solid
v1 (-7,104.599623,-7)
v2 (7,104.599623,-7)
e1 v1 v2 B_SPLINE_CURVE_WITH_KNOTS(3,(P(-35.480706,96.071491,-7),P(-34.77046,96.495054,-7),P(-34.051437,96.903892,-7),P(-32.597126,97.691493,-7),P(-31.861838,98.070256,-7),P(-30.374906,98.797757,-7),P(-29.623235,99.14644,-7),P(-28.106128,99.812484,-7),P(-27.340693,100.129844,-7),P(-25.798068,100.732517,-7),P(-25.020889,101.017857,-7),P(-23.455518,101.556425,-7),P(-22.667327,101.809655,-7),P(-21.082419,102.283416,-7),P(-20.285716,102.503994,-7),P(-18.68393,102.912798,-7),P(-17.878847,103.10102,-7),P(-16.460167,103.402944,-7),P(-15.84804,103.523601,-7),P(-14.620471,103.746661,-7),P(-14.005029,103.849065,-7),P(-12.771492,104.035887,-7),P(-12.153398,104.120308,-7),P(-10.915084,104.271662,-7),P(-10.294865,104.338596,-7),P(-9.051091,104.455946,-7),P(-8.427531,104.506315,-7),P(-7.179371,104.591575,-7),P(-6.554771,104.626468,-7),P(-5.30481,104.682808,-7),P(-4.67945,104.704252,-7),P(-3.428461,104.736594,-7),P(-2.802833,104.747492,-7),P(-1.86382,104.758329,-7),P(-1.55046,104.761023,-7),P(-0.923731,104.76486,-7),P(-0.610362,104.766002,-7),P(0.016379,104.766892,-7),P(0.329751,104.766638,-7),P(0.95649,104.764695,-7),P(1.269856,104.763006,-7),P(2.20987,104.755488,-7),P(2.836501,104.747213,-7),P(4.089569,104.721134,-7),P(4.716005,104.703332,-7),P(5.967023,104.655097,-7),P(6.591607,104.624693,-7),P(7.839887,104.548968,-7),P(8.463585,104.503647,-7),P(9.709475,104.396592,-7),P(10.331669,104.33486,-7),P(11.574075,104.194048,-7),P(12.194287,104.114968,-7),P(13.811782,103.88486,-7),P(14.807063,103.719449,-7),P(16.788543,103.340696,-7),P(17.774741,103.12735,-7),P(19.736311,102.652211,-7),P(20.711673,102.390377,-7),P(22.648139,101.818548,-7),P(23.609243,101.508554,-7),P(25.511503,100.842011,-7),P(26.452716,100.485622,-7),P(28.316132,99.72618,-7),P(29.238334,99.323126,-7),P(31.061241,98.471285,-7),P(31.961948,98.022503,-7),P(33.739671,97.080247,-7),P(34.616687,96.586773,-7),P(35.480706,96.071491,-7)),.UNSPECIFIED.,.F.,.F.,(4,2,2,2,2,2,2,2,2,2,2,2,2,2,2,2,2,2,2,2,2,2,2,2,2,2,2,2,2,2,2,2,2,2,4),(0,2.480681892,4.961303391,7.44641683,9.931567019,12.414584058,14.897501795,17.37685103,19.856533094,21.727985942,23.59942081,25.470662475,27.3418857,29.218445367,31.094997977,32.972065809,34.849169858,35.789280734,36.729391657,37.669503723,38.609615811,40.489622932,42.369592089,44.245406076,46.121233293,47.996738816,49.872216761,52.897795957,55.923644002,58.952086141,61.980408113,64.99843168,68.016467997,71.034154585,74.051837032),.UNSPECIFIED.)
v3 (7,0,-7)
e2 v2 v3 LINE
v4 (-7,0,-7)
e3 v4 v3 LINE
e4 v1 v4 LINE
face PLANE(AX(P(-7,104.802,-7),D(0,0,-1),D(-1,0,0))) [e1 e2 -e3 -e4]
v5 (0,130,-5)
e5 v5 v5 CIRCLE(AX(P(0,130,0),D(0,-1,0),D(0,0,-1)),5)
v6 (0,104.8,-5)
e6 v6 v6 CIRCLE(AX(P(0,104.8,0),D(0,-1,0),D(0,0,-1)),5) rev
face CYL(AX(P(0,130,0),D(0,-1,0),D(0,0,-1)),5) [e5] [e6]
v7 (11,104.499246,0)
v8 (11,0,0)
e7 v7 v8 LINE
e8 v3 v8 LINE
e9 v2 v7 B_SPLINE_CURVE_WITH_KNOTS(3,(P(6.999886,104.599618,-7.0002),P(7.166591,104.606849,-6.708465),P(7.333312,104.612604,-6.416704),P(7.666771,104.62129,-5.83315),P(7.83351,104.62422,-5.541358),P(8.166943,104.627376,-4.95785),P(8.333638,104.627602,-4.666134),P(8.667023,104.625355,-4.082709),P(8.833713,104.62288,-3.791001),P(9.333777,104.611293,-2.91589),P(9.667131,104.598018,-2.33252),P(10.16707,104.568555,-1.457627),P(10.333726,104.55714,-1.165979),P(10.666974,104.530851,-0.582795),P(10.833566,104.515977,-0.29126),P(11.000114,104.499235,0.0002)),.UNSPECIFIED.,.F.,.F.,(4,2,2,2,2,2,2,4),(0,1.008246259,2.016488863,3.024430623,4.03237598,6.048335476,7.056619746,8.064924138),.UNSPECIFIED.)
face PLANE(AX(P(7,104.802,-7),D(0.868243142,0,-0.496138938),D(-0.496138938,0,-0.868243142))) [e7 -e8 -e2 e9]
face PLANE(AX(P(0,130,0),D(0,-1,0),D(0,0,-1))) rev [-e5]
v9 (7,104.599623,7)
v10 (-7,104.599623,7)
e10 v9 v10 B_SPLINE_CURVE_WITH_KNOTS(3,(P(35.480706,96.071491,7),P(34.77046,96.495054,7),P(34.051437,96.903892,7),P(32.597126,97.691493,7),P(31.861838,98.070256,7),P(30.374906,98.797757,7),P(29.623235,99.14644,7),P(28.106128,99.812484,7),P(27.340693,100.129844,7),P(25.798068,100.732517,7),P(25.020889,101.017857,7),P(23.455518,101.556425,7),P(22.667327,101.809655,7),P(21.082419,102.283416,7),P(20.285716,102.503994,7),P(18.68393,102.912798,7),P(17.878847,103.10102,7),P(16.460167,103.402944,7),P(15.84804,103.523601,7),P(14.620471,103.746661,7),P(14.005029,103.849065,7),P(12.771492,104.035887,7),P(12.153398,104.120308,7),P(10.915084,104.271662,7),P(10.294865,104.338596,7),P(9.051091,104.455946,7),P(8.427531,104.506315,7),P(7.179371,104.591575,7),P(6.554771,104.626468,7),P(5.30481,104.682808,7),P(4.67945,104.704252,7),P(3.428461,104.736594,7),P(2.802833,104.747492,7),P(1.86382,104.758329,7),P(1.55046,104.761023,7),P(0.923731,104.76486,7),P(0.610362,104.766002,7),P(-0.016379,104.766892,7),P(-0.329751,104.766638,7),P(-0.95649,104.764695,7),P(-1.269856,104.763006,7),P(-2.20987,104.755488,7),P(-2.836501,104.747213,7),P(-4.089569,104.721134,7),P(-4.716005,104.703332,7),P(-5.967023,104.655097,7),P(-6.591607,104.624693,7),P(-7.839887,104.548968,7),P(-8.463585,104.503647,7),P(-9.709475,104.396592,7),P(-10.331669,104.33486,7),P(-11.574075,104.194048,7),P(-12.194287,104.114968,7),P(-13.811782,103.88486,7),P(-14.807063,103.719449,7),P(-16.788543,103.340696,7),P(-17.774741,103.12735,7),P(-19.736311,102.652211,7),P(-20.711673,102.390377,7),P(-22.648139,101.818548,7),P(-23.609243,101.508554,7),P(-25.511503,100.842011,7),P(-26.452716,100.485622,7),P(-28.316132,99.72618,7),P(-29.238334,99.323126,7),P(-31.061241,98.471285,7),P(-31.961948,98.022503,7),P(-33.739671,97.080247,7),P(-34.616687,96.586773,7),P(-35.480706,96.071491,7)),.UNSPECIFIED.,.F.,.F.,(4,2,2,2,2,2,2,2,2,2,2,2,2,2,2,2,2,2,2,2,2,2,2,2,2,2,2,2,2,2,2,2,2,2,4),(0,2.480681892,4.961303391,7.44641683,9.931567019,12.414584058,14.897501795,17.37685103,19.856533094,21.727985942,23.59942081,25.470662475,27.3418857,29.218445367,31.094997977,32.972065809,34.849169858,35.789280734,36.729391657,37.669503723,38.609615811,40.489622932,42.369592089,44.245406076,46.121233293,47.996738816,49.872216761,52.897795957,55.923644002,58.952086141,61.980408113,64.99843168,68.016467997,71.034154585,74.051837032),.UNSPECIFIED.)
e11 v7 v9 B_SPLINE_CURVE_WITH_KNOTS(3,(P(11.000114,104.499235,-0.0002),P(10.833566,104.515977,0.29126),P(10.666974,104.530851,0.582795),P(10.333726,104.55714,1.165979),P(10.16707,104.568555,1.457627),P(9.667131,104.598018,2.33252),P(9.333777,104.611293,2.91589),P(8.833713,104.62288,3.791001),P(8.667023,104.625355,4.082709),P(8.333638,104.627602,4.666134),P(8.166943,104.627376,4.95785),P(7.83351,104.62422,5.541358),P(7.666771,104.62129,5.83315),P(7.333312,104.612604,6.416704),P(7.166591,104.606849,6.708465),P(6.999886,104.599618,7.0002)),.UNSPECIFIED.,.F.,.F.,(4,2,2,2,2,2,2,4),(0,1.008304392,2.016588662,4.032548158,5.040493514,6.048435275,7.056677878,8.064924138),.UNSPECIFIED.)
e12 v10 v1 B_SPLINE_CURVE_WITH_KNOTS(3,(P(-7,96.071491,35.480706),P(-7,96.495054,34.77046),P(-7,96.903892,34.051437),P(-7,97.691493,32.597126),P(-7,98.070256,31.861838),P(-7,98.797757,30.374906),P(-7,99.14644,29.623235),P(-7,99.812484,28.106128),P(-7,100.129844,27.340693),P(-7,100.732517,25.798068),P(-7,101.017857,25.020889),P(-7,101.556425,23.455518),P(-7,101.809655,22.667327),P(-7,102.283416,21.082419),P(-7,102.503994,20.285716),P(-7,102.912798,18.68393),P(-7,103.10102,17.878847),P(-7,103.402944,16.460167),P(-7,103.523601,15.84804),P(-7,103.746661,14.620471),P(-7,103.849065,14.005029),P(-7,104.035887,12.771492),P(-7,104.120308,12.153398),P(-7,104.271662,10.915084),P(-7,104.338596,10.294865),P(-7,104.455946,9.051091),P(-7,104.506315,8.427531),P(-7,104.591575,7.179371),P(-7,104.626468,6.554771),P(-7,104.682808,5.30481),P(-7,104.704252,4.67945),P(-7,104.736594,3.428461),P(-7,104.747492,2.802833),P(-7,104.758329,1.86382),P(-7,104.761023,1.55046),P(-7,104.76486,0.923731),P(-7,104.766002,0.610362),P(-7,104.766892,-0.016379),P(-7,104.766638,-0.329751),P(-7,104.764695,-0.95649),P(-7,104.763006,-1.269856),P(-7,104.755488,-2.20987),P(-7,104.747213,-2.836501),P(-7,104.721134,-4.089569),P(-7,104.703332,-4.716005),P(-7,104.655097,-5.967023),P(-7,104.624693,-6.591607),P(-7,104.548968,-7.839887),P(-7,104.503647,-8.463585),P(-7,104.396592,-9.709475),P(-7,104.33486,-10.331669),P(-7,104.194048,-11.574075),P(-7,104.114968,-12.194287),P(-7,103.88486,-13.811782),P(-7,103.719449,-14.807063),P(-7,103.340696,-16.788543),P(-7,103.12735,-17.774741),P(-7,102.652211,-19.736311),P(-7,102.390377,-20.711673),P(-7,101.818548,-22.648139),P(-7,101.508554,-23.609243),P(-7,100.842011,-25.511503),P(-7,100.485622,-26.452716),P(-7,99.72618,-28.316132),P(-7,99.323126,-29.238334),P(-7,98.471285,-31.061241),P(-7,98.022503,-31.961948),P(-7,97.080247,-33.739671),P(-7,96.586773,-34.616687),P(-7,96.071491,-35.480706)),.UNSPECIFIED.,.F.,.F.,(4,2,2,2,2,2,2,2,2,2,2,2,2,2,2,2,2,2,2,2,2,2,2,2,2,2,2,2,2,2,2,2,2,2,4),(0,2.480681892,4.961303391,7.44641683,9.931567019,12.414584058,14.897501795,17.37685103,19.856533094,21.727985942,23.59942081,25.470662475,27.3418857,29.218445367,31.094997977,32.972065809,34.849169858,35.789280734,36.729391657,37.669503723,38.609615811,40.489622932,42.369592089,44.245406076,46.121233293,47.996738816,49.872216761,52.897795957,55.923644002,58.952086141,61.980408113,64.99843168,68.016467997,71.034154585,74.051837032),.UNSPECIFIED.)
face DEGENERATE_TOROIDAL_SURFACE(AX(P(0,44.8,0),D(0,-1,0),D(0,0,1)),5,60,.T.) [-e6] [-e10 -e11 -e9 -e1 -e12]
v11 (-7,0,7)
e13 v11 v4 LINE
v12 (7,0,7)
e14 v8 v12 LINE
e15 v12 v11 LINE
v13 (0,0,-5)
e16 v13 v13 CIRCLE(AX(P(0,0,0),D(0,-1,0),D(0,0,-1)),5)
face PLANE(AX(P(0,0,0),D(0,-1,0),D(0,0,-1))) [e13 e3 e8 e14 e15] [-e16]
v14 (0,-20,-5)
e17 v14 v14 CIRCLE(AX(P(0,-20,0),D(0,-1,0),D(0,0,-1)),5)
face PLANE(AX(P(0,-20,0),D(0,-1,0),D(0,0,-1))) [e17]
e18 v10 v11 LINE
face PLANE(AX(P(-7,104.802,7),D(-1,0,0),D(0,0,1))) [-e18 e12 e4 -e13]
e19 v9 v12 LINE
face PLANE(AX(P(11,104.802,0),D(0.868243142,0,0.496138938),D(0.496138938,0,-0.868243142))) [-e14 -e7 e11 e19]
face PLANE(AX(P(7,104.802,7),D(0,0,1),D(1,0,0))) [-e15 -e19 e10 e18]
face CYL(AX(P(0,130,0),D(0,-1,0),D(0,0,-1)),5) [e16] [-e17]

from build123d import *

# Parameters (mm, degrees)
CORPS_D_PLACER_COPIER2_DEPTH = 104.8
BOSS_EXTRU_1_DEPTH           = 20
BOSS_EXTRU_1_DEPTH_BACK      = 130
ESQUISSE1_R                  = 5


with BuildPart() as part:
    # Corps-Déplacer/Copier2: read off the stored shape, not the designer's step
    # Corps-Déplacer/Copier2 outline → Corps-Déplacer/Copier2 (new body)
    with BuildSketch(Plane(origin=(0, 0, 0), x_dir=(1, 0, 0), z_dir=(0, 1, 0))):
        Polygon((7, 7), (-7, 7), (-7, -7), (7, -7), (11, 0), align=None)
    extrude(amount=CORPS_D_PLACER_COPIER2_DEPTH)

    # Corps-D_placer_Copier2 2 outline → Corps-D_placer_Copier2 2 (revolve, cut)
    with BuildSketch(Plane.XY):
        with BuildLine():
            Line((11, 104.8), (5, 104.8))
            ThreePointArc((5, 104.8), (8.003766504, 104.724764387), (11, 104.499246226))
            Line((11, 104.499246226), (11, 104.8))
        make_face()
    revolve(axis=Axis((0, 0, 0), (0, 1, 0)), mode=Mode.SUBTRACT)

    # Esquisse1 → Boss.-Extru.1 (add, two sides: drawn at the far end of the back side and taken through both)
    with BuildSketch(Plane.XZ.offset(-BOSS_EXTRU_1_DEPTH_BACK)):
        with Locations(Location((0, 0, 0), (0, 0, 270))):
            Circle(ESQUISSE1_R)
    extrude(amount=BOSS_EXTRU_1_DEPTH + BOSS_EXTRU_1_DEPTH_BACK)


solid = part.part
